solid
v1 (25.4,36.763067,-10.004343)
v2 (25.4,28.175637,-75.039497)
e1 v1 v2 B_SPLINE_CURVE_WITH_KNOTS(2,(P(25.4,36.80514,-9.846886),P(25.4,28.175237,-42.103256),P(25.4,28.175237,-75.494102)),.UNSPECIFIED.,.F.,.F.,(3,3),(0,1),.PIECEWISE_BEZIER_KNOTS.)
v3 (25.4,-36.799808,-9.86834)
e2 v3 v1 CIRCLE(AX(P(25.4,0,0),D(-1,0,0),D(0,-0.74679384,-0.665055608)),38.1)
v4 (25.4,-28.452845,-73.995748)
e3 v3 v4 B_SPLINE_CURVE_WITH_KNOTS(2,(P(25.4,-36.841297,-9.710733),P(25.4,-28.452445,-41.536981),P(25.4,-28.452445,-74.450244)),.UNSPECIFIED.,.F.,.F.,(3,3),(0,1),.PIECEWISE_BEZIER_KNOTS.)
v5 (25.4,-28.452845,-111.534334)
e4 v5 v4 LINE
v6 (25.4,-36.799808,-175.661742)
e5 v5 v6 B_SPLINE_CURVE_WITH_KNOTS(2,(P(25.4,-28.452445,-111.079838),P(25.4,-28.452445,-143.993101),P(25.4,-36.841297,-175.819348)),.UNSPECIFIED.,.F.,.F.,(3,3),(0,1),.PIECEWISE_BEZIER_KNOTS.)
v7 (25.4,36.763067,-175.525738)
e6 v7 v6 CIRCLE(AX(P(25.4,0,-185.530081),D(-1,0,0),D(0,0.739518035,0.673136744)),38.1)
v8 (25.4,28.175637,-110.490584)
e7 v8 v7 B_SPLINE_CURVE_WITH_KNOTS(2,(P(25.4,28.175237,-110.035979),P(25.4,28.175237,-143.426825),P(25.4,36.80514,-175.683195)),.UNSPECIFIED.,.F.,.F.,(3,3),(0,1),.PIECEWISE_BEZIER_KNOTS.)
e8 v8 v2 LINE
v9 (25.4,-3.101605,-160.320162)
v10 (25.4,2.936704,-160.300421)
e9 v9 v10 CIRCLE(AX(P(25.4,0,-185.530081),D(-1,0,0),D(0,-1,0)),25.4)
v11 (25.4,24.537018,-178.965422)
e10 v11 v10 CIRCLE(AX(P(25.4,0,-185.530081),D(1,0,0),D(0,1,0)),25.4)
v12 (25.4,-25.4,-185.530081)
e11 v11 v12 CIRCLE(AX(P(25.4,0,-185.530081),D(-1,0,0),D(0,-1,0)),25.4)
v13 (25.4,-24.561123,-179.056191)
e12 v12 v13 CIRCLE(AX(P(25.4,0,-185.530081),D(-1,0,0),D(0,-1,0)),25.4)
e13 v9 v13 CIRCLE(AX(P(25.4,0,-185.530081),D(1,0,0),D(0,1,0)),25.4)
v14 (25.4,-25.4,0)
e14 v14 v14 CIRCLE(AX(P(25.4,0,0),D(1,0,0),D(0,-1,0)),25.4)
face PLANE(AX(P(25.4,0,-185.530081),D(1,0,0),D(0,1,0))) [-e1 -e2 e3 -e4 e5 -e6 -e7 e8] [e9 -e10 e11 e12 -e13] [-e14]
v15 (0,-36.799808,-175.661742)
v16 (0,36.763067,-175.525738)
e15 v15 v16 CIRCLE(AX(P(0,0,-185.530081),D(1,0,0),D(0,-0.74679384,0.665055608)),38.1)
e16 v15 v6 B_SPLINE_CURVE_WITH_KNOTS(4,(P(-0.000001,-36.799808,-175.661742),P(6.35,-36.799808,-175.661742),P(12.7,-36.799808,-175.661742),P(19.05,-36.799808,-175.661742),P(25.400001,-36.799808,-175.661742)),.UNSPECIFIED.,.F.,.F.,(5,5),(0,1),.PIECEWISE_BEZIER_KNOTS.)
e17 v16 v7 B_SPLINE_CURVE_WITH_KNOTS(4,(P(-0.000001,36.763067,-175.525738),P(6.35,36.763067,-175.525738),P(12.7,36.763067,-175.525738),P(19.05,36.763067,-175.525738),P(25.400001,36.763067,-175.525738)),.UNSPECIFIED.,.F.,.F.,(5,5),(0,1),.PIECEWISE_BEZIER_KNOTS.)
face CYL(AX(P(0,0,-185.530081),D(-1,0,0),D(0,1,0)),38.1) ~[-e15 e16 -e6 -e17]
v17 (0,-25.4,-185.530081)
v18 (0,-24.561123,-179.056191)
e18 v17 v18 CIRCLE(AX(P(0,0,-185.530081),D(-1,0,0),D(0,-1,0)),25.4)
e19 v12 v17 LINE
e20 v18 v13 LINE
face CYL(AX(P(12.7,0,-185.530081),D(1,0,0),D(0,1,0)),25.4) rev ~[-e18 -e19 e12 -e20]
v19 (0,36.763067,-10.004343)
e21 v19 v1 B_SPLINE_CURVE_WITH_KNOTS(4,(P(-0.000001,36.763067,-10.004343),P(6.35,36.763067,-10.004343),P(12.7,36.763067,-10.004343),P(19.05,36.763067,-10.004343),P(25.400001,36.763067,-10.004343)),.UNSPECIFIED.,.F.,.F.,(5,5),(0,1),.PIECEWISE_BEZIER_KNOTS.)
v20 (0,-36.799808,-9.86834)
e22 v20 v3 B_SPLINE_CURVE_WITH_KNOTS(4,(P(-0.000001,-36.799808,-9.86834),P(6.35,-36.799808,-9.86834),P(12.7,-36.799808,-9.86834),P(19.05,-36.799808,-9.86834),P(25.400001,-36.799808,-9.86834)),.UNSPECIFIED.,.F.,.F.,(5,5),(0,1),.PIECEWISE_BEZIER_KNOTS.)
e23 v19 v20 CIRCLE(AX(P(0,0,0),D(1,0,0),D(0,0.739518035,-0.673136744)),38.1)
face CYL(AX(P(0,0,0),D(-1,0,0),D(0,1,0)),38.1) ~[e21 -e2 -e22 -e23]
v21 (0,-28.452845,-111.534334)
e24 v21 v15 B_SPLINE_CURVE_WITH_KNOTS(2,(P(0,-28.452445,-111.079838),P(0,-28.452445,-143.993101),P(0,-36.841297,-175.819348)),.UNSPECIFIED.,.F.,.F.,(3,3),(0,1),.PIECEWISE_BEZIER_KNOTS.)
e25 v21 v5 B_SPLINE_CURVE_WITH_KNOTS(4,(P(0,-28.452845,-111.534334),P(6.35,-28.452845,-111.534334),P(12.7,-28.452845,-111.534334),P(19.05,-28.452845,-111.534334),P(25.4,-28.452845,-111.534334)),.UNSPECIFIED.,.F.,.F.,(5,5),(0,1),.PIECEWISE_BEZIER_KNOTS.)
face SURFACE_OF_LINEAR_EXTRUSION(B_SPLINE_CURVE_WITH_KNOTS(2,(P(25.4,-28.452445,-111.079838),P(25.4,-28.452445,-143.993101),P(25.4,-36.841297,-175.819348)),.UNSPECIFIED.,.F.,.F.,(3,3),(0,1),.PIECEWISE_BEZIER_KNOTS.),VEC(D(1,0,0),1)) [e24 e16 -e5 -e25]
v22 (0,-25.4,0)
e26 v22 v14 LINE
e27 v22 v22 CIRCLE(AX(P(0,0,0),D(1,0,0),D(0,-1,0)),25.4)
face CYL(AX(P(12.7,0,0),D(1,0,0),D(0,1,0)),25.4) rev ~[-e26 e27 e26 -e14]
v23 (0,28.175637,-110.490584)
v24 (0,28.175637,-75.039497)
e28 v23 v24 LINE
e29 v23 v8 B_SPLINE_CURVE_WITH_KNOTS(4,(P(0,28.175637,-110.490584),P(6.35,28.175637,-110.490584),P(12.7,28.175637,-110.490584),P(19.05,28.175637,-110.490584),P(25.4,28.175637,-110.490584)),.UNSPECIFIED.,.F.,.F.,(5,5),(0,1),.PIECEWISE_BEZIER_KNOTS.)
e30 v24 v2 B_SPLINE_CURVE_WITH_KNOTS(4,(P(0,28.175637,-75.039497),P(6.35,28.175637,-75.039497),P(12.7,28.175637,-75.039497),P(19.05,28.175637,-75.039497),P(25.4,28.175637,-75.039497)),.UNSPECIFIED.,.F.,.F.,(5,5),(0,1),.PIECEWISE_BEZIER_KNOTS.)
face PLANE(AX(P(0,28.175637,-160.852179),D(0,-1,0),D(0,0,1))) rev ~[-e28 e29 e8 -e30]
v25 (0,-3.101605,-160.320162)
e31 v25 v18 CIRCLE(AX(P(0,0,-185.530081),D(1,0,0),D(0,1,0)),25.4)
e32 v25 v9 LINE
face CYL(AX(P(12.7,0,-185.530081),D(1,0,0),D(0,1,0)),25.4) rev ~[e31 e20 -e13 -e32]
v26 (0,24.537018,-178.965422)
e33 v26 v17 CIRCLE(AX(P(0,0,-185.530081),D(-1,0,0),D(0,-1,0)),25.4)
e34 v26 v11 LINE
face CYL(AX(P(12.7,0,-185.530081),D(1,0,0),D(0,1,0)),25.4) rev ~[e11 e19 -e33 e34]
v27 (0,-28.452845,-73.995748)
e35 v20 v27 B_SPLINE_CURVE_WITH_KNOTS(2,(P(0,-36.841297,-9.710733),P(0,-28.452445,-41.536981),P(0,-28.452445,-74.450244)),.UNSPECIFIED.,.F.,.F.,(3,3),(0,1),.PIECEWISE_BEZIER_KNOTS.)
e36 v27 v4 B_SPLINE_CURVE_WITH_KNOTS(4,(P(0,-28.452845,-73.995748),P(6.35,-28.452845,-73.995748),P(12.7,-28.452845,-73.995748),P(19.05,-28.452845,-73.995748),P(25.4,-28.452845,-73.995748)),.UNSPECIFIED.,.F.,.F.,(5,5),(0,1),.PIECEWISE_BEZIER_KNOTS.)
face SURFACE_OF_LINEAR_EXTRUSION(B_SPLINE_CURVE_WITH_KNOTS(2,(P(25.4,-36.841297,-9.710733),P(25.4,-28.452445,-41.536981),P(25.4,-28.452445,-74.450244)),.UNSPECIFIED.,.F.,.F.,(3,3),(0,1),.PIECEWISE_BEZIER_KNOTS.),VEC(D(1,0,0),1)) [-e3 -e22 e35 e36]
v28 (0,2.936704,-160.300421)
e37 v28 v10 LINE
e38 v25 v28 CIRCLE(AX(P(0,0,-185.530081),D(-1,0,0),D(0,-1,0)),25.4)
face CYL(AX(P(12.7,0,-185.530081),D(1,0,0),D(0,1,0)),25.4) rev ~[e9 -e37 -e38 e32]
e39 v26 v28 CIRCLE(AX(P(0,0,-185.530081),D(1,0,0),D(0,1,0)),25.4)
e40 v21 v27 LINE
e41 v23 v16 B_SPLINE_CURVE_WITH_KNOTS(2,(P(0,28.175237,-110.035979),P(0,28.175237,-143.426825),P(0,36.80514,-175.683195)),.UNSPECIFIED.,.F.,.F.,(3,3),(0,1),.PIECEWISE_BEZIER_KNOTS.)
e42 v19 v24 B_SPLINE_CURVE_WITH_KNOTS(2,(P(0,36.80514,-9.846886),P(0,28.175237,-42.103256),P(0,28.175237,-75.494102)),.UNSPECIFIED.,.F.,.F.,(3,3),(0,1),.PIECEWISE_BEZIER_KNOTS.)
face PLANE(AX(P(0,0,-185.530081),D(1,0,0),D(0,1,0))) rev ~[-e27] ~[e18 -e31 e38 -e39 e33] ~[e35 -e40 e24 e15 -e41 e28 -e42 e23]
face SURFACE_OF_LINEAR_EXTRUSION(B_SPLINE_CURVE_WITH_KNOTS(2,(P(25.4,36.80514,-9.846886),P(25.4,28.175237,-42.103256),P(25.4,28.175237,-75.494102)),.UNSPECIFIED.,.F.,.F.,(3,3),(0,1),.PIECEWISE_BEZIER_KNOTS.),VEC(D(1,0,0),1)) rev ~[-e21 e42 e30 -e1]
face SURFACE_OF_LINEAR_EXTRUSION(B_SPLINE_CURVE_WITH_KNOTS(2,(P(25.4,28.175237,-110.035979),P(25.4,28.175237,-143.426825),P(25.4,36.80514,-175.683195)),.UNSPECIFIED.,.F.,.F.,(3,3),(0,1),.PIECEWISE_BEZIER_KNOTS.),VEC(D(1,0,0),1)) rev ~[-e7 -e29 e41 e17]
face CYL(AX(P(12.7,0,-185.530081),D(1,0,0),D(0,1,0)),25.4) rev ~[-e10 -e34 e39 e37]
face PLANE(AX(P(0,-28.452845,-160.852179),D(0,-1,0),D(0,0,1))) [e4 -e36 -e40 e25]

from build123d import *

# Parameters (mm, degrees)
F2_W          = 56.6284824163
F2_H          = 136.3001726568
F3_DEPTH      = 25.4
F0_R          = 38.1
F4_DEPTH      = 25.4
F1_R          = 38.1
F5_DEPTH      = 25.4
F6_D          = 50.8
F8_D          = 50.8
F11_T4_DEPTH  = 25.4
F11_S5_R      = 25.4
F11_T6_DEPTH  = 43
F11_T10_DEPTH = 25.4
F11_S11_R     = 25.4
F11_T12_DEPTH = 43
F11_T16_DEPTH = 25.4
F11_S17_R     = 25.4
F11_T18_DEPTH = 43
F11_T22_DEPTH = 25.4
F11_S23_R     = 25.4
F11_T24_DEPTH = 43


# Not quite as in the source:
# - a fillet or chamfer that OpenCascade refuses, or shapes differently, is made with other operations: its cross-section is extruded or revolved along the edge and cut away or added
# - two fillets or chamfers of one size are made in one step


with BuildPart() as f3:
    # F2 (on Right) → F3 (new body)
    with BuildSketch(Plane.YZ):
        with Locations((-0.1386040822, -92.7020926028)):
            Rectangle(F2_W, F2_H)
    extrude(amount=F3_DEPTH)

    # F0 (on Right) → F4 (join)
    with BuildSketch(Plane.YZ):
        Circle(F0_R)
    extrude(amount=F4_DEPTH)

    # F1 (on Right) → F5 (join)
    with BuildSketch(Plane.YZ):
        with Locations((0, -185.5300813913)):
            Circle(F1_R)
    extrude(amount=F5_DEPTH)

    # F6 (through all)
    with Locations(Plane(origin=(0, 0, 0), x_dir=(0, 1, 0), z_dir=(-1, 0, 0))):
        with Locations((0, 0)):
            Hole(F6_D / 2)

    # F8 (through all)
    with Locations(Plane.YZ.offset(25.4)):
        with Locations((0, -185.5300813913)):
            Hole(F8_D / 2)

    # F11: fillet of radius 254 on 4 edges, made by hand


with BuildPart() as f11_tool2:
    # F11_s3 → F11_t4 (new body)
    with BuildSketch(Plane.YZ.offset(25.4)):
        with BuildLine():
            add(Edge.make_bspline(
                [(-28.4524452903, -111.0798377649), (-28.4524452903, -143.9931007722), (-36.841297299, -175.8193484896)],
                knots=[0, 0, 0, 1, 1, 1], degree=2, weights=[1, 1, 1]))
            Line((-36.841297299, -175.8193484896), (-12.2799424998, -182.293299562))
            ThreePointArc((-12.2799424998, -182.293299562), (-11.1895620368, -179.5236177494), (-9.4841025329, -177.0840347894))
            Line((-9.4841025329, -177.0840347894), (-3.0526052903, -160.1914627454))
            ThreePointArc((-3.0526052903, -160.1914627454), (-3.0526052903, -135.6356502551), (-3.0522052903, -111.0798377649))
            Line((-3.0522052903, -111.0798377649), (-28.4524452903, -111.0798377649))
        make_face()
    extrude(amount=-F11_T4_DEPTH)

    # F11_s5 → F11_t6 (cut, symmetric)
    with BuildSketch(Plane.YZ.offset(12.7)):
        with Locations((0, -185.5300813913)):
            Circle(F11_S5_R)
    extrude(amount=F11_T6_DEPTH, both=True, mode=Mode.SUBTRACT)


with BuildPart() as f3_1:
    add(f3.part)

    # F11_t1: union F11_tool2
    add(f11_tool2.part)


with BuildPart() as f11_tool8:
    # F11_s9 → F11_t10 (new body)
    with BuildSketch(Plane.YZ.offset(25.4)):
        with BuildLine():
            add(Edge.make_bspline(
                [(-36.841297299, -9.7107329018), (-28.4524452903, -41.5369806191), (-28.4524452903, -74.4502436264)],
                knots=[0, 0, 0, 1, 1, 1], degree=2, weights=[1, 1, 1]))
            Line((-28.4524452903, -74.4502436264), (-3.0522052903, -74.4502436264))
            ThreePointArc((-3.0522052903, -74.4502436264), (-3.0526052903, -49.8944311362), (-3.0526052903, -25.338618646))
            Line((-3.0526052903, -25.338618646), (-9.4841025329, -8.446046602))
            ThreePointArc((-9.4841025329, -8.446046602), (-11.1895620368, -6.0064636419), (-12.2799424998, -3.2367818293))
            Line((-12.2799424998, -3.2367818293), (-36.841297299, -9.7107329018))
        make_face()
    extrude(amount=-F11_T10_DEPTH)

    # F11_s11 → F11_t12 (cut, symmetric)
    with BuildSketch(Plane.YZ.offset(12.7)):
        Circle(F11_S11_R)
    extrude(amount=F11_T12_DEPTH, both=True, mode=Mode.SUBTRACT)


with BuildPart() as f3_2:
    add(f3_1.part)

    # F11_t7: union F11_tool8
    add(f11_tool8.part)


with BuildPart() as f11_tool14:
    # F11_s15 → F11_t16 (new body)
    with BuildSketch(Plane.YZ.offset(25.4)):
        with BuildLine():
            add(Edge.make_bspline(
                [(36.8051403395, -9.8468860434), (28.175237126, -42.1032559751), (28.175237126, -75.4941024849)],
                knots=[0, 0, 0, 1, 1, 1], degree=2, weights=[1, 1, 1]))
            Line((28.175237126, -75.4941024849), (2.774997126, -75.4941024849))
            ThreePointArc((2.774997126, -75.4941024849), (2.775397126, -50.5703062168), (2.775397126, -25.6465099486))
            Line((2.775397126, -25.6465099486), (9.3917015577, -8.5486750967))
            ThreePointArc((9.3917015577, -8.5486750967), (11.1455038849, -6.0878277907), (12.2678906608, -3.2821643992))
            Line((12.2678906608, -3.2821643992), (36.8051403395, -9.8468860434))
        make_face()
    extrude(amount=-F11_T16_DEPTH)

    # F11_s17 → F11_t18 (cut, symmetric)
    with BuildSketch(Plane.YZ.offset(12.7)):
        Circle(F11_S17_R)
    extrude(amount=F11_T18_DEPTH, both=True, mode=Mode.SUBTRACT)


with BuildPart() as f3_3:
    add(f3_2.part)

    # F11_t13: union F11_tool14
    add(f11_tool14.part)


with BuildPart() as f11_tool20:
    # F11_s21 → F11_t22 (new body)
    with BuildSketch(Plane.YZ.offset(25.4)):
        with BuildLine():
            add(Edge.make_bspline(
                [(28.175237126, -110.0359789064), (28.175237126, -143.4268254163), (36.8051403395, -175.683195348)],
                knots=[0, 0, 0, 1, 1, 1], degree=2, weights=[1, 1, 1]))
            Line((36.8051403395, -175.683195348), (12.2678906608, -182.2479169921))
            ThreePointArc((12.2678906608, -182.2479169921), (11.1455038849, -179.4422536006), (9.3917015577, -176.9814062946))
            Line((9.3917015577, -176.9814062946), (2.775397126, -159.8835714427))
            ThreePointArc((2.775397126, -159.8835714427), (2.775397126, -134.9597751745), (2.774997126, -110.0359789064))
            Line((2.774997126, -110.0359789064), (28.175237126, -110.0359789064))
        make_face()
    extrude(amount=-F11_T22_DEPTH)

    # F11_s23 → F11_t24 (cut, symmetric)
    with BuildSketch(Plane.YZ.offset(12.7)):
        with Locations((0, -185.5300813913)):
            Circle(F11_S23_R)
    extrude(amount=F11_T24_DEPTH, both=True, mode=Mode.SUBTRACT)


with BuildPart() as f3_4:
    add(f3_3.part)

    # F11_t19: union F11_tool20
    add(f11_tool20.part)


solid = f3_4.part
